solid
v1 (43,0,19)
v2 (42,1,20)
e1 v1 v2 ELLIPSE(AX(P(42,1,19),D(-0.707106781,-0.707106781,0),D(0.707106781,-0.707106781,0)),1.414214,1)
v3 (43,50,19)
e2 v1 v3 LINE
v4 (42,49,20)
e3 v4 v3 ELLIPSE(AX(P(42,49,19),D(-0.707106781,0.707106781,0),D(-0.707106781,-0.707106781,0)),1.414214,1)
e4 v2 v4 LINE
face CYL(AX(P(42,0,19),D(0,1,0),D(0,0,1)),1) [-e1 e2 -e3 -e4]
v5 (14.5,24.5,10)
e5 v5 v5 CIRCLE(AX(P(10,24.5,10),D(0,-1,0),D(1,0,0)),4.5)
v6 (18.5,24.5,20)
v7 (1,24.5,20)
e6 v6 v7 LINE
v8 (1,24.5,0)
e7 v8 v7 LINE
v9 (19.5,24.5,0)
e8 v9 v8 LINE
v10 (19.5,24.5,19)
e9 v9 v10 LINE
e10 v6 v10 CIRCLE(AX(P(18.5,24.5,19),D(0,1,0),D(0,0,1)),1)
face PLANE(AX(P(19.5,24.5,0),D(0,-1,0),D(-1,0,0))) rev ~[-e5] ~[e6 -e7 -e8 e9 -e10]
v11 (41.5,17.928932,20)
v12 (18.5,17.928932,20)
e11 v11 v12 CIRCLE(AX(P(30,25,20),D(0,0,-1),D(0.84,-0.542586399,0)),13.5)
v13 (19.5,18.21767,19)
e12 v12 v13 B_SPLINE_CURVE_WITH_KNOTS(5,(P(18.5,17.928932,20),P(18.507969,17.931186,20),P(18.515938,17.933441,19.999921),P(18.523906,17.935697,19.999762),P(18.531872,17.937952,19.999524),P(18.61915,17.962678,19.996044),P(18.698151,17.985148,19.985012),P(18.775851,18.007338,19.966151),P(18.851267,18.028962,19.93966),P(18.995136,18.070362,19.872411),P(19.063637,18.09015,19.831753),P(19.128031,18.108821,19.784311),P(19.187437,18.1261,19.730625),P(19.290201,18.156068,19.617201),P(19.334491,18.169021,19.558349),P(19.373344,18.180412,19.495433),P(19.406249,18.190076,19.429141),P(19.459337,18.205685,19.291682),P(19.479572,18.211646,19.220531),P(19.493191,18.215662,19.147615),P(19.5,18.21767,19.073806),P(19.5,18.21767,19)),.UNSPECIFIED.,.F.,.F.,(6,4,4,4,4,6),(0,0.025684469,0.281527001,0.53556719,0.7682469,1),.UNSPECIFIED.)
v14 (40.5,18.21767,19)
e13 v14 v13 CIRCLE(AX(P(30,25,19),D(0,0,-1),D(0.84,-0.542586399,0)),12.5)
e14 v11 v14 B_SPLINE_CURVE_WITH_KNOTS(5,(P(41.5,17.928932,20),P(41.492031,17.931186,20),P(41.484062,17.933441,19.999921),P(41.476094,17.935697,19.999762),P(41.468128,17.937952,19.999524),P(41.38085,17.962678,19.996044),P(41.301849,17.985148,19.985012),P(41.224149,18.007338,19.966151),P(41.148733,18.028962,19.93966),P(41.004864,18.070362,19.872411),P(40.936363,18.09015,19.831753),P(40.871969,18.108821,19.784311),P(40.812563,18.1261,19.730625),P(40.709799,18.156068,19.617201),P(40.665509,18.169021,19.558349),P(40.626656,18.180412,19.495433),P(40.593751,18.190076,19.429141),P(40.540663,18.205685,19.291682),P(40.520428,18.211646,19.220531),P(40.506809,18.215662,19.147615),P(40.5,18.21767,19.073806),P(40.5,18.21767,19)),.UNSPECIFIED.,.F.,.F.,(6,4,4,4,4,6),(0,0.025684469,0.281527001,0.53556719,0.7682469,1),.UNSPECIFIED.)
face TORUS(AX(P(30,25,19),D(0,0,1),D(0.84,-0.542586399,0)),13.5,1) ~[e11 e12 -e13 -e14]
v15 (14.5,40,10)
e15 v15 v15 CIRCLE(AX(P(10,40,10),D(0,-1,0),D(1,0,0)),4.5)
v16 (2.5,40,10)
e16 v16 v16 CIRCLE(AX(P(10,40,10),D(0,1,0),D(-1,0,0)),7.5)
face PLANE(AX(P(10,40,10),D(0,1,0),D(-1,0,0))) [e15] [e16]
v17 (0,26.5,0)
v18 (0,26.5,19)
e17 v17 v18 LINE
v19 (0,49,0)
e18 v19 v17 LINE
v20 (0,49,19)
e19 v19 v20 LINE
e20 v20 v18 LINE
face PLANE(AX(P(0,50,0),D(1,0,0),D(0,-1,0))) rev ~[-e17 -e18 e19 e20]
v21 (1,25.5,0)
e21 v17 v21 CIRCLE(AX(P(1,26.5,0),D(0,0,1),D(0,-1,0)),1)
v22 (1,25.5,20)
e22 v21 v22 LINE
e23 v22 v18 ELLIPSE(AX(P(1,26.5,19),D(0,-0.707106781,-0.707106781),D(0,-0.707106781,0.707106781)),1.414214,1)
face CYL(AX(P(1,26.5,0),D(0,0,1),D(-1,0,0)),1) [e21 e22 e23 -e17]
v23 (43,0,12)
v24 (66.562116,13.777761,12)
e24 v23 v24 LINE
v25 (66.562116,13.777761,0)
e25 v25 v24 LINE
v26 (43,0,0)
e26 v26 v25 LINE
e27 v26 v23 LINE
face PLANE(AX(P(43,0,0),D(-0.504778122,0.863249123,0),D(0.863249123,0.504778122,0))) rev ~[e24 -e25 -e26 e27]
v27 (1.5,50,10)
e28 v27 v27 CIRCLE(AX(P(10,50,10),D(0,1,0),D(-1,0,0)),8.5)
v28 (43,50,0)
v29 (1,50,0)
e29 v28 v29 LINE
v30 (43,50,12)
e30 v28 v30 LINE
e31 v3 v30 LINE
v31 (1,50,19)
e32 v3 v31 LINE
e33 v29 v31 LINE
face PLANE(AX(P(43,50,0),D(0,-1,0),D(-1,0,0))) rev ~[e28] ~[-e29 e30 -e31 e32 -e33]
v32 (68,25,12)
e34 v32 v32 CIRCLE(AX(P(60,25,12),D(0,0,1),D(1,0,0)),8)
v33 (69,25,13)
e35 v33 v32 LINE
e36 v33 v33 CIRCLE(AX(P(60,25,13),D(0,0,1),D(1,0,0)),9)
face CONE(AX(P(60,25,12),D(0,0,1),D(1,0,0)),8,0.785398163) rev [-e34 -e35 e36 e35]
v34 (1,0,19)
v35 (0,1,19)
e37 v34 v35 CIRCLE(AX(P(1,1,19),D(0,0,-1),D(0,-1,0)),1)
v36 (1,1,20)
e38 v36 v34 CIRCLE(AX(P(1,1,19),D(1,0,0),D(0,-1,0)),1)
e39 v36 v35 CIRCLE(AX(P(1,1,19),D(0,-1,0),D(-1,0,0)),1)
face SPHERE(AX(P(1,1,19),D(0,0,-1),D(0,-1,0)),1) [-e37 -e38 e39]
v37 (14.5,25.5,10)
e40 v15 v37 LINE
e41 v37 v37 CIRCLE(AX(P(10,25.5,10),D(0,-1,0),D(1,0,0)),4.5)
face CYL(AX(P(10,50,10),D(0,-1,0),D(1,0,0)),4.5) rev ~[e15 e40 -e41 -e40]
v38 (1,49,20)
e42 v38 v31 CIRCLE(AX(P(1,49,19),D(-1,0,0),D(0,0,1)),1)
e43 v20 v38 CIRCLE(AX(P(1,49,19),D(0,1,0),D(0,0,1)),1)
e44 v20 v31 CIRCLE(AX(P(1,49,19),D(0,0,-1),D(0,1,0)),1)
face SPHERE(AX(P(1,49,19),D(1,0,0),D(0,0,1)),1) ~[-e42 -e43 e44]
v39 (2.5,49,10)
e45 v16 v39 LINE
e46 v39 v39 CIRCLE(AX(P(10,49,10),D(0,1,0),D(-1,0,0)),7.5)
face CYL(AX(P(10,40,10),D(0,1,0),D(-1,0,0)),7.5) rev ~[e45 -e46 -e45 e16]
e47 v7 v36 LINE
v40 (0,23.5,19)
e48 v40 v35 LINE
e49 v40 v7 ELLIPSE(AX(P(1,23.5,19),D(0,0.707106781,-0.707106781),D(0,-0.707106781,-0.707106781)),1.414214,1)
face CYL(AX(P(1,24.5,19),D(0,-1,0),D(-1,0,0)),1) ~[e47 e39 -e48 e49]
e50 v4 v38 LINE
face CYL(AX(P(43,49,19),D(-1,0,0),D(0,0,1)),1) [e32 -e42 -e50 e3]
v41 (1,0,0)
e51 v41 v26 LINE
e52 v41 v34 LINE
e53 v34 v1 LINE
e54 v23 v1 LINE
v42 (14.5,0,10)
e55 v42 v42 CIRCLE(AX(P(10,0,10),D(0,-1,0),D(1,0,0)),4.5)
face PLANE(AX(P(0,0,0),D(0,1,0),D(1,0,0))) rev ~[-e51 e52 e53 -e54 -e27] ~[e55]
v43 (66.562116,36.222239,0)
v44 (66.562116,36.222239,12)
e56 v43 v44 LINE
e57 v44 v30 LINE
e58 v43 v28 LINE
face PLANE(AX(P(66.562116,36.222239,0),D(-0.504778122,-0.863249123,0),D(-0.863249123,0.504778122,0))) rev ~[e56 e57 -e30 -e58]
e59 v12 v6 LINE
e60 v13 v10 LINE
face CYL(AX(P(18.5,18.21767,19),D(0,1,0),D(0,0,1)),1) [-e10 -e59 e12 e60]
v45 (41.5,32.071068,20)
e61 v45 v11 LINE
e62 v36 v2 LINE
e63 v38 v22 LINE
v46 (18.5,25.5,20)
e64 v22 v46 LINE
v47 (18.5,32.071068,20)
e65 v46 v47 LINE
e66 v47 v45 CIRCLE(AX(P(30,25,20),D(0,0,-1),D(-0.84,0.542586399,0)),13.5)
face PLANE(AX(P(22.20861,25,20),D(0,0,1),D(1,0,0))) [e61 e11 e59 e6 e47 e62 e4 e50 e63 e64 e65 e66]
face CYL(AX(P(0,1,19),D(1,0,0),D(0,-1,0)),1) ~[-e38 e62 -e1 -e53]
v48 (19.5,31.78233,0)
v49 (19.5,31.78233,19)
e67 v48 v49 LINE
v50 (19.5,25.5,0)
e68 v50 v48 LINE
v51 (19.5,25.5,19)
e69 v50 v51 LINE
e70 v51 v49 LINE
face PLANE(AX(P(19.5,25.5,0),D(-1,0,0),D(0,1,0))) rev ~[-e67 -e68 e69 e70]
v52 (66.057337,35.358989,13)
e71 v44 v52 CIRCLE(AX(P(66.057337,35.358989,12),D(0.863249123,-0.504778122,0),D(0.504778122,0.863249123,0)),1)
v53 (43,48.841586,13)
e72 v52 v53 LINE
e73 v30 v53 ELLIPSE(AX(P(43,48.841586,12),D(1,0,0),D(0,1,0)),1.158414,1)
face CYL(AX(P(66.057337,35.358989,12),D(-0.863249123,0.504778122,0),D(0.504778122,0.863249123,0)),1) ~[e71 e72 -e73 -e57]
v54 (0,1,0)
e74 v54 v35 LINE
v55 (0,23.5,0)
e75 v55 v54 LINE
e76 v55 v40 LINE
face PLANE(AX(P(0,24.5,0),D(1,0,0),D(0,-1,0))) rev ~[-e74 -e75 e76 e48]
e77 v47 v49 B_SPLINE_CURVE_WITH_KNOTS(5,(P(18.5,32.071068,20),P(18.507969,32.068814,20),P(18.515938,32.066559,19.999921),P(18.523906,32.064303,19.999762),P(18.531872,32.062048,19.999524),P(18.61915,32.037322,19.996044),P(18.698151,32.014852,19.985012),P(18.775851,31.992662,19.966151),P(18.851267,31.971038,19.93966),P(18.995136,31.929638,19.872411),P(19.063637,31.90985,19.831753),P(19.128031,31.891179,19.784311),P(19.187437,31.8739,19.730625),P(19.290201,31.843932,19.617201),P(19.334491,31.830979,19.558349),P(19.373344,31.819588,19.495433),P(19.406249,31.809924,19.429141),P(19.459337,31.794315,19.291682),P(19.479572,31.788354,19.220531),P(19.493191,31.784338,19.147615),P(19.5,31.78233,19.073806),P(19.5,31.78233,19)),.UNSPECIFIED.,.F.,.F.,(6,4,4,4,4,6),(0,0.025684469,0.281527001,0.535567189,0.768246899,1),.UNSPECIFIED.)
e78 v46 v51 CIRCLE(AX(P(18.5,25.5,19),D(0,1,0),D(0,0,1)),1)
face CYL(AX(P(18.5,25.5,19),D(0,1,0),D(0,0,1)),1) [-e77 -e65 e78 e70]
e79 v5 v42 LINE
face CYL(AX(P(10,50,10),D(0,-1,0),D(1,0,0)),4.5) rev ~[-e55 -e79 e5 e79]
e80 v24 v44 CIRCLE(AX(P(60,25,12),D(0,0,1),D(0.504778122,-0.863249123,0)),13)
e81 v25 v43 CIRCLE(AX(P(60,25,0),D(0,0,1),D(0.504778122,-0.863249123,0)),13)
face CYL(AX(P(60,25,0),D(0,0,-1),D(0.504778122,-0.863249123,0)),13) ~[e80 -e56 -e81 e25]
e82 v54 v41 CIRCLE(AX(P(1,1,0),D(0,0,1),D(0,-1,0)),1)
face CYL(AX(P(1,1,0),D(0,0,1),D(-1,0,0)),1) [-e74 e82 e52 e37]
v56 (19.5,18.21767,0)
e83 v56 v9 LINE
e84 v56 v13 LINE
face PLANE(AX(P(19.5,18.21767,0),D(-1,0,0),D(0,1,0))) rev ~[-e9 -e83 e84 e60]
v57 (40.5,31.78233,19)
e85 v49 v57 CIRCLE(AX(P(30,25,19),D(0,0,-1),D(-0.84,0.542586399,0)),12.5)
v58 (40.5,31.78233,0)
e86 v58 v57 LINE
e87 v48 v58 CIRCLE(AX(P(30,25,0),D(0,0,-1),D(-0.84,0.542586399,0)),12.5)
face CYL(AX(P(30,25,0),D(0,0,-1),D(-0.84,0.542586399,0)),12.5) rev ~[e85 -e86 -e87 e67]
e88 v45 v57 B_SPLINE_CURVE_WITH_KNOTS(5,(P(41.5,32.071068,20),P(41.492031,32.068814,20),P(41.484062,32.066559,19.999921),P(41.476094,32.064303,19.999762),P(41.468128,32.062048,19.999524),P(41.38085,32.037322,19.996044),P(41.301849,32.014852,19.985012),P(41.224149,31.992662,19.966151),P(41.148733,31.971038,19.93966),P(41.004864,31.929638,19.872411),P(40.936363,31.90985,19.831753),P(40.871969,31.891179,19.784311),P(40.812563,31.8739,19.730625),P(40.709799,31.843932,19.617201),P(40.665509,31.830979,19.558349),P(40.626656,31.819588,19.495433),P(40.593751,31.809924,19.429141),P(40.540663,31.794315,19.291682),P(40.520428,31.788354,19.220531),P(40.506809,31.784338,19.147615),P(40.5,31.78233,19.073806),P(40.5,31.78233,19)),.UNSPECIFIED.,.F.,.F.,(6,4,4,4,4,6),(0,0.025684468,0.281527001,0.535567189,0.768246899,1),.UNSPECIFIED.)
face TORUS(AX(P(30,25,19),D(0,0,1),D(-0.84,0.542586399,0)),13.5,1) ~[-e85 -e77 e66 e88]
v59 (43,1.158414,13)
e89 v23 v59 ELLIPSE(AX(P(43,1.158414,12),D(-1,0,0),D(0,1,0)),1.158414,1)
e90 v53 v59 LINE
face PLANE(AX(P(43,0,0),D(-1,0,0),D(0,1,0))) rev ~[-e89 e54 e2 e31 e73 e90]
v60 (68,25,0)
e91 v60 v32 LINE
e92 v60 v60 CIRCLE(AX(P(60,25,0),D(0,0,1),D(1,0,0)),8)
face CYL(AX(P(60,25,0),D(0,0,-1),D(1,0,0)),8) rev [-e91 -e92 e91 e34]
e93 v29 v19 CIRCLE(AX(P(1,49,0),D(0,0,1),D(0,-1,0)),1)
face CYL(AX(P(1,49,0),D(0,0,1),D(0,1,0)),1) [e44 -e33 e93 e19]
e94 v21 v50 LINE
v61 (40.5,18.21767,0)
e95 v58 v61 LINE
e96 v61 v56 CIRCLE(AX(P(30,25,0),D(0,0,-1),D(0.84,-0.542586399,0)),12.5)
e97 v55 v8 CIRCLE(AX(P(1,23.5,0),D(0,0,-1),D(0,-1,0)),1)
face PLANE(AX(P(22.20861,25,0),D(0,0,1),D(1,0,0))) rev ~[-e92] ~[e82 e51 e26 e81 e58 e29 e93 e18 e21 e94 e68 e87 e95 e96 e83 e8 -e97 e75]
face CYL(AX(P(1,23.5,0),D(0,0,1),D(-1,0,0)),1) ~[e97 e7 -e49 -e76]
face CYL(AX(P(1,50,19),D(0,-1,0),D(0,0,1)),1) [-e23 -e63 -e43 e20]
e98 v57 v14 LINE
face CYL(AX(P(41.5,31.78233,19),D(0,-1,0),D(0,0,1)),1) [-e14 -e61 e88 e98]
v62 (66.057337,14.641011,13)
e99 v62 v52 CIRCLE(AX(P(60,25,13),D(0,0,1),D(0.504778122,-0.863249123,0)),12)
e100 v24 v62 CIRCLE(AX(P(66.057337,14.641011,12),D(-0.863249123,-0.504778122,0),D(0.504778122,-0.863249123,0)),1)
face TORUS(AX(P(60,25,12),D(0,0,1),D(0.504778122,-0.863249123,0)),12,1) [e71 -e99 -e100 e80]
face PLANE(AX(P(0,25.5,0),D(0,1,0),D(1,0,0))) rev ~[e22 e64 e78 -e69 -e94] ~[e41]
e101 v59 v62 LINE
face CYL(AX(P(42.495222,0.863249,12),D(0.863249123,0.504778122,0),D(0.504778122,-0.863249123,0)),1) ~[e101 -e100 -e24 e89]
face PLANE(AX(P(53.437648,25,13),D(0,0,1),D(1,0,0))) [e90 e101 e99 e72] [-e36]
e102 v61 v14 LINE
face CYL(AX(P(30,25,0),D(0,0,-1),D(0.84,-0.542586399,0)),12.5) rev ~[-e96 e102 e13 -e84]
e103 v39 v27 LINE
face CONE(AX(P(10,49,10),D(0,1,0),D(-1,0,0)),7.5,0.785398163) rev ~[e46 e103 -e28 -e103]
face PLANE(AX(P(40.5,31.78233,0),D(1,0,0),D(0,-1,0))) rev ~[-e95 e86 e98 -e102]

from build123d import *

# Parameters (mm, degrees)
F0_R           = 8
F1_DEPTH       = 13
F2_DEPTH       = 20
F4_D           = 9
F4_CBORE_D     = 15
F4_CBORE_DEPTH = 10
F5_R           = 1
F6_SIZE2       = 1
F6_SIZE        = 1


with BuildPart() as f1:
    # F0 (on Top) → F1 (new body)
    with BuildSketch(Plane.XY):
        with BuildLine():
            Line((43, 50), (43, 0))
            Line((43, 0), (66.5621155816, 13.7777614045))
            ThreePointArc((66.5621155816, 13.7777614045), (73, 25), (66.5621155816, 36.2222385955))
            Line((66.5621155816, 36.2222385955), (43, 50))
        make_face()
        with Locations((60, 25)):
            Circle(F0_R, mode=Mode.SUBTRACT)
    extrude(amount=F1_DEPTH)

    # F0 (on Top) → F2 (join)
    with BuildSketch(Plane.XY):
        with BuildLine():
            Line((0, 24.5), (0, 0))
            Line((0, 0), (43, 0))
            Line((43, 0), (43, 50))
            Line((43, 50), (0, 50))
            Line((0, 50), (0, 25.5))
            Line((0, 25.5), (19.5, 25.5))
            Line((19.5, 25.5), (19.5, 31.7823299831))
            ThreePointArc((19.5, 31.7823299831), (30, 37.5), (40.5, 31.7823299831))
            Line((40.5, 31.7823299831), (40.5, 18.2176700169))
            ThreePointArc((40.5, 18.2176700169), (30, 12.5), (19.5, 18.2176700169))
            Line((19.5, 18.2176700169), (19.5, 24.5))
            Line((19.5, 24.5), (0, 24.5))
        make_face()
    extrude(amount=F2_DEPTH)

    # F4 (through all)
    with Locations(Plane(origin=(0, 50, 0), x_dir=(-1, 0, 0), z_dir=(0, 1, 0))):
        with Locations((-10, 10)):
            CounterBoreHole(F4_D / 2, F4_CBORE_D / 2, F4_CBORE_DEPTH)

    # F5
    f5_edges = [f1.edges().sort_by_distance(p)[0] for p in [
        (0, 0, 10),
        (21.5, 50, 20),
        (0, 37.75, 20),
        (21.5, 0, 20),
        (43, 25, 20),
        (30, 37.5, 20),
        (30, 12.5, 20),
        (40.5, 25, 20),
        (19.5, 21.358835, 20),
        (19.5, 28.641165, 20),
        (0, 25.5, 10),
        (54.781058, 6.888881, 13),
        (0, 12.25, 20),
        (0, 24.5, 10),
        (0, 50, 10),
        (54.781058, 43.111119, 13),
        (73, 25, 13),
    ]]
    fillet(f5_edges, radius=F5_R)

    # F6
    f6_edges = [f1.edges().sort_by_distance(p)[0] for p in [
        (52, 25, 13),
        (17.5, 50, 10),
    ]]
    chamfer(f6_edges, length=F6_SIZE, length2=F6_SIZE2)


solid = f1.part
